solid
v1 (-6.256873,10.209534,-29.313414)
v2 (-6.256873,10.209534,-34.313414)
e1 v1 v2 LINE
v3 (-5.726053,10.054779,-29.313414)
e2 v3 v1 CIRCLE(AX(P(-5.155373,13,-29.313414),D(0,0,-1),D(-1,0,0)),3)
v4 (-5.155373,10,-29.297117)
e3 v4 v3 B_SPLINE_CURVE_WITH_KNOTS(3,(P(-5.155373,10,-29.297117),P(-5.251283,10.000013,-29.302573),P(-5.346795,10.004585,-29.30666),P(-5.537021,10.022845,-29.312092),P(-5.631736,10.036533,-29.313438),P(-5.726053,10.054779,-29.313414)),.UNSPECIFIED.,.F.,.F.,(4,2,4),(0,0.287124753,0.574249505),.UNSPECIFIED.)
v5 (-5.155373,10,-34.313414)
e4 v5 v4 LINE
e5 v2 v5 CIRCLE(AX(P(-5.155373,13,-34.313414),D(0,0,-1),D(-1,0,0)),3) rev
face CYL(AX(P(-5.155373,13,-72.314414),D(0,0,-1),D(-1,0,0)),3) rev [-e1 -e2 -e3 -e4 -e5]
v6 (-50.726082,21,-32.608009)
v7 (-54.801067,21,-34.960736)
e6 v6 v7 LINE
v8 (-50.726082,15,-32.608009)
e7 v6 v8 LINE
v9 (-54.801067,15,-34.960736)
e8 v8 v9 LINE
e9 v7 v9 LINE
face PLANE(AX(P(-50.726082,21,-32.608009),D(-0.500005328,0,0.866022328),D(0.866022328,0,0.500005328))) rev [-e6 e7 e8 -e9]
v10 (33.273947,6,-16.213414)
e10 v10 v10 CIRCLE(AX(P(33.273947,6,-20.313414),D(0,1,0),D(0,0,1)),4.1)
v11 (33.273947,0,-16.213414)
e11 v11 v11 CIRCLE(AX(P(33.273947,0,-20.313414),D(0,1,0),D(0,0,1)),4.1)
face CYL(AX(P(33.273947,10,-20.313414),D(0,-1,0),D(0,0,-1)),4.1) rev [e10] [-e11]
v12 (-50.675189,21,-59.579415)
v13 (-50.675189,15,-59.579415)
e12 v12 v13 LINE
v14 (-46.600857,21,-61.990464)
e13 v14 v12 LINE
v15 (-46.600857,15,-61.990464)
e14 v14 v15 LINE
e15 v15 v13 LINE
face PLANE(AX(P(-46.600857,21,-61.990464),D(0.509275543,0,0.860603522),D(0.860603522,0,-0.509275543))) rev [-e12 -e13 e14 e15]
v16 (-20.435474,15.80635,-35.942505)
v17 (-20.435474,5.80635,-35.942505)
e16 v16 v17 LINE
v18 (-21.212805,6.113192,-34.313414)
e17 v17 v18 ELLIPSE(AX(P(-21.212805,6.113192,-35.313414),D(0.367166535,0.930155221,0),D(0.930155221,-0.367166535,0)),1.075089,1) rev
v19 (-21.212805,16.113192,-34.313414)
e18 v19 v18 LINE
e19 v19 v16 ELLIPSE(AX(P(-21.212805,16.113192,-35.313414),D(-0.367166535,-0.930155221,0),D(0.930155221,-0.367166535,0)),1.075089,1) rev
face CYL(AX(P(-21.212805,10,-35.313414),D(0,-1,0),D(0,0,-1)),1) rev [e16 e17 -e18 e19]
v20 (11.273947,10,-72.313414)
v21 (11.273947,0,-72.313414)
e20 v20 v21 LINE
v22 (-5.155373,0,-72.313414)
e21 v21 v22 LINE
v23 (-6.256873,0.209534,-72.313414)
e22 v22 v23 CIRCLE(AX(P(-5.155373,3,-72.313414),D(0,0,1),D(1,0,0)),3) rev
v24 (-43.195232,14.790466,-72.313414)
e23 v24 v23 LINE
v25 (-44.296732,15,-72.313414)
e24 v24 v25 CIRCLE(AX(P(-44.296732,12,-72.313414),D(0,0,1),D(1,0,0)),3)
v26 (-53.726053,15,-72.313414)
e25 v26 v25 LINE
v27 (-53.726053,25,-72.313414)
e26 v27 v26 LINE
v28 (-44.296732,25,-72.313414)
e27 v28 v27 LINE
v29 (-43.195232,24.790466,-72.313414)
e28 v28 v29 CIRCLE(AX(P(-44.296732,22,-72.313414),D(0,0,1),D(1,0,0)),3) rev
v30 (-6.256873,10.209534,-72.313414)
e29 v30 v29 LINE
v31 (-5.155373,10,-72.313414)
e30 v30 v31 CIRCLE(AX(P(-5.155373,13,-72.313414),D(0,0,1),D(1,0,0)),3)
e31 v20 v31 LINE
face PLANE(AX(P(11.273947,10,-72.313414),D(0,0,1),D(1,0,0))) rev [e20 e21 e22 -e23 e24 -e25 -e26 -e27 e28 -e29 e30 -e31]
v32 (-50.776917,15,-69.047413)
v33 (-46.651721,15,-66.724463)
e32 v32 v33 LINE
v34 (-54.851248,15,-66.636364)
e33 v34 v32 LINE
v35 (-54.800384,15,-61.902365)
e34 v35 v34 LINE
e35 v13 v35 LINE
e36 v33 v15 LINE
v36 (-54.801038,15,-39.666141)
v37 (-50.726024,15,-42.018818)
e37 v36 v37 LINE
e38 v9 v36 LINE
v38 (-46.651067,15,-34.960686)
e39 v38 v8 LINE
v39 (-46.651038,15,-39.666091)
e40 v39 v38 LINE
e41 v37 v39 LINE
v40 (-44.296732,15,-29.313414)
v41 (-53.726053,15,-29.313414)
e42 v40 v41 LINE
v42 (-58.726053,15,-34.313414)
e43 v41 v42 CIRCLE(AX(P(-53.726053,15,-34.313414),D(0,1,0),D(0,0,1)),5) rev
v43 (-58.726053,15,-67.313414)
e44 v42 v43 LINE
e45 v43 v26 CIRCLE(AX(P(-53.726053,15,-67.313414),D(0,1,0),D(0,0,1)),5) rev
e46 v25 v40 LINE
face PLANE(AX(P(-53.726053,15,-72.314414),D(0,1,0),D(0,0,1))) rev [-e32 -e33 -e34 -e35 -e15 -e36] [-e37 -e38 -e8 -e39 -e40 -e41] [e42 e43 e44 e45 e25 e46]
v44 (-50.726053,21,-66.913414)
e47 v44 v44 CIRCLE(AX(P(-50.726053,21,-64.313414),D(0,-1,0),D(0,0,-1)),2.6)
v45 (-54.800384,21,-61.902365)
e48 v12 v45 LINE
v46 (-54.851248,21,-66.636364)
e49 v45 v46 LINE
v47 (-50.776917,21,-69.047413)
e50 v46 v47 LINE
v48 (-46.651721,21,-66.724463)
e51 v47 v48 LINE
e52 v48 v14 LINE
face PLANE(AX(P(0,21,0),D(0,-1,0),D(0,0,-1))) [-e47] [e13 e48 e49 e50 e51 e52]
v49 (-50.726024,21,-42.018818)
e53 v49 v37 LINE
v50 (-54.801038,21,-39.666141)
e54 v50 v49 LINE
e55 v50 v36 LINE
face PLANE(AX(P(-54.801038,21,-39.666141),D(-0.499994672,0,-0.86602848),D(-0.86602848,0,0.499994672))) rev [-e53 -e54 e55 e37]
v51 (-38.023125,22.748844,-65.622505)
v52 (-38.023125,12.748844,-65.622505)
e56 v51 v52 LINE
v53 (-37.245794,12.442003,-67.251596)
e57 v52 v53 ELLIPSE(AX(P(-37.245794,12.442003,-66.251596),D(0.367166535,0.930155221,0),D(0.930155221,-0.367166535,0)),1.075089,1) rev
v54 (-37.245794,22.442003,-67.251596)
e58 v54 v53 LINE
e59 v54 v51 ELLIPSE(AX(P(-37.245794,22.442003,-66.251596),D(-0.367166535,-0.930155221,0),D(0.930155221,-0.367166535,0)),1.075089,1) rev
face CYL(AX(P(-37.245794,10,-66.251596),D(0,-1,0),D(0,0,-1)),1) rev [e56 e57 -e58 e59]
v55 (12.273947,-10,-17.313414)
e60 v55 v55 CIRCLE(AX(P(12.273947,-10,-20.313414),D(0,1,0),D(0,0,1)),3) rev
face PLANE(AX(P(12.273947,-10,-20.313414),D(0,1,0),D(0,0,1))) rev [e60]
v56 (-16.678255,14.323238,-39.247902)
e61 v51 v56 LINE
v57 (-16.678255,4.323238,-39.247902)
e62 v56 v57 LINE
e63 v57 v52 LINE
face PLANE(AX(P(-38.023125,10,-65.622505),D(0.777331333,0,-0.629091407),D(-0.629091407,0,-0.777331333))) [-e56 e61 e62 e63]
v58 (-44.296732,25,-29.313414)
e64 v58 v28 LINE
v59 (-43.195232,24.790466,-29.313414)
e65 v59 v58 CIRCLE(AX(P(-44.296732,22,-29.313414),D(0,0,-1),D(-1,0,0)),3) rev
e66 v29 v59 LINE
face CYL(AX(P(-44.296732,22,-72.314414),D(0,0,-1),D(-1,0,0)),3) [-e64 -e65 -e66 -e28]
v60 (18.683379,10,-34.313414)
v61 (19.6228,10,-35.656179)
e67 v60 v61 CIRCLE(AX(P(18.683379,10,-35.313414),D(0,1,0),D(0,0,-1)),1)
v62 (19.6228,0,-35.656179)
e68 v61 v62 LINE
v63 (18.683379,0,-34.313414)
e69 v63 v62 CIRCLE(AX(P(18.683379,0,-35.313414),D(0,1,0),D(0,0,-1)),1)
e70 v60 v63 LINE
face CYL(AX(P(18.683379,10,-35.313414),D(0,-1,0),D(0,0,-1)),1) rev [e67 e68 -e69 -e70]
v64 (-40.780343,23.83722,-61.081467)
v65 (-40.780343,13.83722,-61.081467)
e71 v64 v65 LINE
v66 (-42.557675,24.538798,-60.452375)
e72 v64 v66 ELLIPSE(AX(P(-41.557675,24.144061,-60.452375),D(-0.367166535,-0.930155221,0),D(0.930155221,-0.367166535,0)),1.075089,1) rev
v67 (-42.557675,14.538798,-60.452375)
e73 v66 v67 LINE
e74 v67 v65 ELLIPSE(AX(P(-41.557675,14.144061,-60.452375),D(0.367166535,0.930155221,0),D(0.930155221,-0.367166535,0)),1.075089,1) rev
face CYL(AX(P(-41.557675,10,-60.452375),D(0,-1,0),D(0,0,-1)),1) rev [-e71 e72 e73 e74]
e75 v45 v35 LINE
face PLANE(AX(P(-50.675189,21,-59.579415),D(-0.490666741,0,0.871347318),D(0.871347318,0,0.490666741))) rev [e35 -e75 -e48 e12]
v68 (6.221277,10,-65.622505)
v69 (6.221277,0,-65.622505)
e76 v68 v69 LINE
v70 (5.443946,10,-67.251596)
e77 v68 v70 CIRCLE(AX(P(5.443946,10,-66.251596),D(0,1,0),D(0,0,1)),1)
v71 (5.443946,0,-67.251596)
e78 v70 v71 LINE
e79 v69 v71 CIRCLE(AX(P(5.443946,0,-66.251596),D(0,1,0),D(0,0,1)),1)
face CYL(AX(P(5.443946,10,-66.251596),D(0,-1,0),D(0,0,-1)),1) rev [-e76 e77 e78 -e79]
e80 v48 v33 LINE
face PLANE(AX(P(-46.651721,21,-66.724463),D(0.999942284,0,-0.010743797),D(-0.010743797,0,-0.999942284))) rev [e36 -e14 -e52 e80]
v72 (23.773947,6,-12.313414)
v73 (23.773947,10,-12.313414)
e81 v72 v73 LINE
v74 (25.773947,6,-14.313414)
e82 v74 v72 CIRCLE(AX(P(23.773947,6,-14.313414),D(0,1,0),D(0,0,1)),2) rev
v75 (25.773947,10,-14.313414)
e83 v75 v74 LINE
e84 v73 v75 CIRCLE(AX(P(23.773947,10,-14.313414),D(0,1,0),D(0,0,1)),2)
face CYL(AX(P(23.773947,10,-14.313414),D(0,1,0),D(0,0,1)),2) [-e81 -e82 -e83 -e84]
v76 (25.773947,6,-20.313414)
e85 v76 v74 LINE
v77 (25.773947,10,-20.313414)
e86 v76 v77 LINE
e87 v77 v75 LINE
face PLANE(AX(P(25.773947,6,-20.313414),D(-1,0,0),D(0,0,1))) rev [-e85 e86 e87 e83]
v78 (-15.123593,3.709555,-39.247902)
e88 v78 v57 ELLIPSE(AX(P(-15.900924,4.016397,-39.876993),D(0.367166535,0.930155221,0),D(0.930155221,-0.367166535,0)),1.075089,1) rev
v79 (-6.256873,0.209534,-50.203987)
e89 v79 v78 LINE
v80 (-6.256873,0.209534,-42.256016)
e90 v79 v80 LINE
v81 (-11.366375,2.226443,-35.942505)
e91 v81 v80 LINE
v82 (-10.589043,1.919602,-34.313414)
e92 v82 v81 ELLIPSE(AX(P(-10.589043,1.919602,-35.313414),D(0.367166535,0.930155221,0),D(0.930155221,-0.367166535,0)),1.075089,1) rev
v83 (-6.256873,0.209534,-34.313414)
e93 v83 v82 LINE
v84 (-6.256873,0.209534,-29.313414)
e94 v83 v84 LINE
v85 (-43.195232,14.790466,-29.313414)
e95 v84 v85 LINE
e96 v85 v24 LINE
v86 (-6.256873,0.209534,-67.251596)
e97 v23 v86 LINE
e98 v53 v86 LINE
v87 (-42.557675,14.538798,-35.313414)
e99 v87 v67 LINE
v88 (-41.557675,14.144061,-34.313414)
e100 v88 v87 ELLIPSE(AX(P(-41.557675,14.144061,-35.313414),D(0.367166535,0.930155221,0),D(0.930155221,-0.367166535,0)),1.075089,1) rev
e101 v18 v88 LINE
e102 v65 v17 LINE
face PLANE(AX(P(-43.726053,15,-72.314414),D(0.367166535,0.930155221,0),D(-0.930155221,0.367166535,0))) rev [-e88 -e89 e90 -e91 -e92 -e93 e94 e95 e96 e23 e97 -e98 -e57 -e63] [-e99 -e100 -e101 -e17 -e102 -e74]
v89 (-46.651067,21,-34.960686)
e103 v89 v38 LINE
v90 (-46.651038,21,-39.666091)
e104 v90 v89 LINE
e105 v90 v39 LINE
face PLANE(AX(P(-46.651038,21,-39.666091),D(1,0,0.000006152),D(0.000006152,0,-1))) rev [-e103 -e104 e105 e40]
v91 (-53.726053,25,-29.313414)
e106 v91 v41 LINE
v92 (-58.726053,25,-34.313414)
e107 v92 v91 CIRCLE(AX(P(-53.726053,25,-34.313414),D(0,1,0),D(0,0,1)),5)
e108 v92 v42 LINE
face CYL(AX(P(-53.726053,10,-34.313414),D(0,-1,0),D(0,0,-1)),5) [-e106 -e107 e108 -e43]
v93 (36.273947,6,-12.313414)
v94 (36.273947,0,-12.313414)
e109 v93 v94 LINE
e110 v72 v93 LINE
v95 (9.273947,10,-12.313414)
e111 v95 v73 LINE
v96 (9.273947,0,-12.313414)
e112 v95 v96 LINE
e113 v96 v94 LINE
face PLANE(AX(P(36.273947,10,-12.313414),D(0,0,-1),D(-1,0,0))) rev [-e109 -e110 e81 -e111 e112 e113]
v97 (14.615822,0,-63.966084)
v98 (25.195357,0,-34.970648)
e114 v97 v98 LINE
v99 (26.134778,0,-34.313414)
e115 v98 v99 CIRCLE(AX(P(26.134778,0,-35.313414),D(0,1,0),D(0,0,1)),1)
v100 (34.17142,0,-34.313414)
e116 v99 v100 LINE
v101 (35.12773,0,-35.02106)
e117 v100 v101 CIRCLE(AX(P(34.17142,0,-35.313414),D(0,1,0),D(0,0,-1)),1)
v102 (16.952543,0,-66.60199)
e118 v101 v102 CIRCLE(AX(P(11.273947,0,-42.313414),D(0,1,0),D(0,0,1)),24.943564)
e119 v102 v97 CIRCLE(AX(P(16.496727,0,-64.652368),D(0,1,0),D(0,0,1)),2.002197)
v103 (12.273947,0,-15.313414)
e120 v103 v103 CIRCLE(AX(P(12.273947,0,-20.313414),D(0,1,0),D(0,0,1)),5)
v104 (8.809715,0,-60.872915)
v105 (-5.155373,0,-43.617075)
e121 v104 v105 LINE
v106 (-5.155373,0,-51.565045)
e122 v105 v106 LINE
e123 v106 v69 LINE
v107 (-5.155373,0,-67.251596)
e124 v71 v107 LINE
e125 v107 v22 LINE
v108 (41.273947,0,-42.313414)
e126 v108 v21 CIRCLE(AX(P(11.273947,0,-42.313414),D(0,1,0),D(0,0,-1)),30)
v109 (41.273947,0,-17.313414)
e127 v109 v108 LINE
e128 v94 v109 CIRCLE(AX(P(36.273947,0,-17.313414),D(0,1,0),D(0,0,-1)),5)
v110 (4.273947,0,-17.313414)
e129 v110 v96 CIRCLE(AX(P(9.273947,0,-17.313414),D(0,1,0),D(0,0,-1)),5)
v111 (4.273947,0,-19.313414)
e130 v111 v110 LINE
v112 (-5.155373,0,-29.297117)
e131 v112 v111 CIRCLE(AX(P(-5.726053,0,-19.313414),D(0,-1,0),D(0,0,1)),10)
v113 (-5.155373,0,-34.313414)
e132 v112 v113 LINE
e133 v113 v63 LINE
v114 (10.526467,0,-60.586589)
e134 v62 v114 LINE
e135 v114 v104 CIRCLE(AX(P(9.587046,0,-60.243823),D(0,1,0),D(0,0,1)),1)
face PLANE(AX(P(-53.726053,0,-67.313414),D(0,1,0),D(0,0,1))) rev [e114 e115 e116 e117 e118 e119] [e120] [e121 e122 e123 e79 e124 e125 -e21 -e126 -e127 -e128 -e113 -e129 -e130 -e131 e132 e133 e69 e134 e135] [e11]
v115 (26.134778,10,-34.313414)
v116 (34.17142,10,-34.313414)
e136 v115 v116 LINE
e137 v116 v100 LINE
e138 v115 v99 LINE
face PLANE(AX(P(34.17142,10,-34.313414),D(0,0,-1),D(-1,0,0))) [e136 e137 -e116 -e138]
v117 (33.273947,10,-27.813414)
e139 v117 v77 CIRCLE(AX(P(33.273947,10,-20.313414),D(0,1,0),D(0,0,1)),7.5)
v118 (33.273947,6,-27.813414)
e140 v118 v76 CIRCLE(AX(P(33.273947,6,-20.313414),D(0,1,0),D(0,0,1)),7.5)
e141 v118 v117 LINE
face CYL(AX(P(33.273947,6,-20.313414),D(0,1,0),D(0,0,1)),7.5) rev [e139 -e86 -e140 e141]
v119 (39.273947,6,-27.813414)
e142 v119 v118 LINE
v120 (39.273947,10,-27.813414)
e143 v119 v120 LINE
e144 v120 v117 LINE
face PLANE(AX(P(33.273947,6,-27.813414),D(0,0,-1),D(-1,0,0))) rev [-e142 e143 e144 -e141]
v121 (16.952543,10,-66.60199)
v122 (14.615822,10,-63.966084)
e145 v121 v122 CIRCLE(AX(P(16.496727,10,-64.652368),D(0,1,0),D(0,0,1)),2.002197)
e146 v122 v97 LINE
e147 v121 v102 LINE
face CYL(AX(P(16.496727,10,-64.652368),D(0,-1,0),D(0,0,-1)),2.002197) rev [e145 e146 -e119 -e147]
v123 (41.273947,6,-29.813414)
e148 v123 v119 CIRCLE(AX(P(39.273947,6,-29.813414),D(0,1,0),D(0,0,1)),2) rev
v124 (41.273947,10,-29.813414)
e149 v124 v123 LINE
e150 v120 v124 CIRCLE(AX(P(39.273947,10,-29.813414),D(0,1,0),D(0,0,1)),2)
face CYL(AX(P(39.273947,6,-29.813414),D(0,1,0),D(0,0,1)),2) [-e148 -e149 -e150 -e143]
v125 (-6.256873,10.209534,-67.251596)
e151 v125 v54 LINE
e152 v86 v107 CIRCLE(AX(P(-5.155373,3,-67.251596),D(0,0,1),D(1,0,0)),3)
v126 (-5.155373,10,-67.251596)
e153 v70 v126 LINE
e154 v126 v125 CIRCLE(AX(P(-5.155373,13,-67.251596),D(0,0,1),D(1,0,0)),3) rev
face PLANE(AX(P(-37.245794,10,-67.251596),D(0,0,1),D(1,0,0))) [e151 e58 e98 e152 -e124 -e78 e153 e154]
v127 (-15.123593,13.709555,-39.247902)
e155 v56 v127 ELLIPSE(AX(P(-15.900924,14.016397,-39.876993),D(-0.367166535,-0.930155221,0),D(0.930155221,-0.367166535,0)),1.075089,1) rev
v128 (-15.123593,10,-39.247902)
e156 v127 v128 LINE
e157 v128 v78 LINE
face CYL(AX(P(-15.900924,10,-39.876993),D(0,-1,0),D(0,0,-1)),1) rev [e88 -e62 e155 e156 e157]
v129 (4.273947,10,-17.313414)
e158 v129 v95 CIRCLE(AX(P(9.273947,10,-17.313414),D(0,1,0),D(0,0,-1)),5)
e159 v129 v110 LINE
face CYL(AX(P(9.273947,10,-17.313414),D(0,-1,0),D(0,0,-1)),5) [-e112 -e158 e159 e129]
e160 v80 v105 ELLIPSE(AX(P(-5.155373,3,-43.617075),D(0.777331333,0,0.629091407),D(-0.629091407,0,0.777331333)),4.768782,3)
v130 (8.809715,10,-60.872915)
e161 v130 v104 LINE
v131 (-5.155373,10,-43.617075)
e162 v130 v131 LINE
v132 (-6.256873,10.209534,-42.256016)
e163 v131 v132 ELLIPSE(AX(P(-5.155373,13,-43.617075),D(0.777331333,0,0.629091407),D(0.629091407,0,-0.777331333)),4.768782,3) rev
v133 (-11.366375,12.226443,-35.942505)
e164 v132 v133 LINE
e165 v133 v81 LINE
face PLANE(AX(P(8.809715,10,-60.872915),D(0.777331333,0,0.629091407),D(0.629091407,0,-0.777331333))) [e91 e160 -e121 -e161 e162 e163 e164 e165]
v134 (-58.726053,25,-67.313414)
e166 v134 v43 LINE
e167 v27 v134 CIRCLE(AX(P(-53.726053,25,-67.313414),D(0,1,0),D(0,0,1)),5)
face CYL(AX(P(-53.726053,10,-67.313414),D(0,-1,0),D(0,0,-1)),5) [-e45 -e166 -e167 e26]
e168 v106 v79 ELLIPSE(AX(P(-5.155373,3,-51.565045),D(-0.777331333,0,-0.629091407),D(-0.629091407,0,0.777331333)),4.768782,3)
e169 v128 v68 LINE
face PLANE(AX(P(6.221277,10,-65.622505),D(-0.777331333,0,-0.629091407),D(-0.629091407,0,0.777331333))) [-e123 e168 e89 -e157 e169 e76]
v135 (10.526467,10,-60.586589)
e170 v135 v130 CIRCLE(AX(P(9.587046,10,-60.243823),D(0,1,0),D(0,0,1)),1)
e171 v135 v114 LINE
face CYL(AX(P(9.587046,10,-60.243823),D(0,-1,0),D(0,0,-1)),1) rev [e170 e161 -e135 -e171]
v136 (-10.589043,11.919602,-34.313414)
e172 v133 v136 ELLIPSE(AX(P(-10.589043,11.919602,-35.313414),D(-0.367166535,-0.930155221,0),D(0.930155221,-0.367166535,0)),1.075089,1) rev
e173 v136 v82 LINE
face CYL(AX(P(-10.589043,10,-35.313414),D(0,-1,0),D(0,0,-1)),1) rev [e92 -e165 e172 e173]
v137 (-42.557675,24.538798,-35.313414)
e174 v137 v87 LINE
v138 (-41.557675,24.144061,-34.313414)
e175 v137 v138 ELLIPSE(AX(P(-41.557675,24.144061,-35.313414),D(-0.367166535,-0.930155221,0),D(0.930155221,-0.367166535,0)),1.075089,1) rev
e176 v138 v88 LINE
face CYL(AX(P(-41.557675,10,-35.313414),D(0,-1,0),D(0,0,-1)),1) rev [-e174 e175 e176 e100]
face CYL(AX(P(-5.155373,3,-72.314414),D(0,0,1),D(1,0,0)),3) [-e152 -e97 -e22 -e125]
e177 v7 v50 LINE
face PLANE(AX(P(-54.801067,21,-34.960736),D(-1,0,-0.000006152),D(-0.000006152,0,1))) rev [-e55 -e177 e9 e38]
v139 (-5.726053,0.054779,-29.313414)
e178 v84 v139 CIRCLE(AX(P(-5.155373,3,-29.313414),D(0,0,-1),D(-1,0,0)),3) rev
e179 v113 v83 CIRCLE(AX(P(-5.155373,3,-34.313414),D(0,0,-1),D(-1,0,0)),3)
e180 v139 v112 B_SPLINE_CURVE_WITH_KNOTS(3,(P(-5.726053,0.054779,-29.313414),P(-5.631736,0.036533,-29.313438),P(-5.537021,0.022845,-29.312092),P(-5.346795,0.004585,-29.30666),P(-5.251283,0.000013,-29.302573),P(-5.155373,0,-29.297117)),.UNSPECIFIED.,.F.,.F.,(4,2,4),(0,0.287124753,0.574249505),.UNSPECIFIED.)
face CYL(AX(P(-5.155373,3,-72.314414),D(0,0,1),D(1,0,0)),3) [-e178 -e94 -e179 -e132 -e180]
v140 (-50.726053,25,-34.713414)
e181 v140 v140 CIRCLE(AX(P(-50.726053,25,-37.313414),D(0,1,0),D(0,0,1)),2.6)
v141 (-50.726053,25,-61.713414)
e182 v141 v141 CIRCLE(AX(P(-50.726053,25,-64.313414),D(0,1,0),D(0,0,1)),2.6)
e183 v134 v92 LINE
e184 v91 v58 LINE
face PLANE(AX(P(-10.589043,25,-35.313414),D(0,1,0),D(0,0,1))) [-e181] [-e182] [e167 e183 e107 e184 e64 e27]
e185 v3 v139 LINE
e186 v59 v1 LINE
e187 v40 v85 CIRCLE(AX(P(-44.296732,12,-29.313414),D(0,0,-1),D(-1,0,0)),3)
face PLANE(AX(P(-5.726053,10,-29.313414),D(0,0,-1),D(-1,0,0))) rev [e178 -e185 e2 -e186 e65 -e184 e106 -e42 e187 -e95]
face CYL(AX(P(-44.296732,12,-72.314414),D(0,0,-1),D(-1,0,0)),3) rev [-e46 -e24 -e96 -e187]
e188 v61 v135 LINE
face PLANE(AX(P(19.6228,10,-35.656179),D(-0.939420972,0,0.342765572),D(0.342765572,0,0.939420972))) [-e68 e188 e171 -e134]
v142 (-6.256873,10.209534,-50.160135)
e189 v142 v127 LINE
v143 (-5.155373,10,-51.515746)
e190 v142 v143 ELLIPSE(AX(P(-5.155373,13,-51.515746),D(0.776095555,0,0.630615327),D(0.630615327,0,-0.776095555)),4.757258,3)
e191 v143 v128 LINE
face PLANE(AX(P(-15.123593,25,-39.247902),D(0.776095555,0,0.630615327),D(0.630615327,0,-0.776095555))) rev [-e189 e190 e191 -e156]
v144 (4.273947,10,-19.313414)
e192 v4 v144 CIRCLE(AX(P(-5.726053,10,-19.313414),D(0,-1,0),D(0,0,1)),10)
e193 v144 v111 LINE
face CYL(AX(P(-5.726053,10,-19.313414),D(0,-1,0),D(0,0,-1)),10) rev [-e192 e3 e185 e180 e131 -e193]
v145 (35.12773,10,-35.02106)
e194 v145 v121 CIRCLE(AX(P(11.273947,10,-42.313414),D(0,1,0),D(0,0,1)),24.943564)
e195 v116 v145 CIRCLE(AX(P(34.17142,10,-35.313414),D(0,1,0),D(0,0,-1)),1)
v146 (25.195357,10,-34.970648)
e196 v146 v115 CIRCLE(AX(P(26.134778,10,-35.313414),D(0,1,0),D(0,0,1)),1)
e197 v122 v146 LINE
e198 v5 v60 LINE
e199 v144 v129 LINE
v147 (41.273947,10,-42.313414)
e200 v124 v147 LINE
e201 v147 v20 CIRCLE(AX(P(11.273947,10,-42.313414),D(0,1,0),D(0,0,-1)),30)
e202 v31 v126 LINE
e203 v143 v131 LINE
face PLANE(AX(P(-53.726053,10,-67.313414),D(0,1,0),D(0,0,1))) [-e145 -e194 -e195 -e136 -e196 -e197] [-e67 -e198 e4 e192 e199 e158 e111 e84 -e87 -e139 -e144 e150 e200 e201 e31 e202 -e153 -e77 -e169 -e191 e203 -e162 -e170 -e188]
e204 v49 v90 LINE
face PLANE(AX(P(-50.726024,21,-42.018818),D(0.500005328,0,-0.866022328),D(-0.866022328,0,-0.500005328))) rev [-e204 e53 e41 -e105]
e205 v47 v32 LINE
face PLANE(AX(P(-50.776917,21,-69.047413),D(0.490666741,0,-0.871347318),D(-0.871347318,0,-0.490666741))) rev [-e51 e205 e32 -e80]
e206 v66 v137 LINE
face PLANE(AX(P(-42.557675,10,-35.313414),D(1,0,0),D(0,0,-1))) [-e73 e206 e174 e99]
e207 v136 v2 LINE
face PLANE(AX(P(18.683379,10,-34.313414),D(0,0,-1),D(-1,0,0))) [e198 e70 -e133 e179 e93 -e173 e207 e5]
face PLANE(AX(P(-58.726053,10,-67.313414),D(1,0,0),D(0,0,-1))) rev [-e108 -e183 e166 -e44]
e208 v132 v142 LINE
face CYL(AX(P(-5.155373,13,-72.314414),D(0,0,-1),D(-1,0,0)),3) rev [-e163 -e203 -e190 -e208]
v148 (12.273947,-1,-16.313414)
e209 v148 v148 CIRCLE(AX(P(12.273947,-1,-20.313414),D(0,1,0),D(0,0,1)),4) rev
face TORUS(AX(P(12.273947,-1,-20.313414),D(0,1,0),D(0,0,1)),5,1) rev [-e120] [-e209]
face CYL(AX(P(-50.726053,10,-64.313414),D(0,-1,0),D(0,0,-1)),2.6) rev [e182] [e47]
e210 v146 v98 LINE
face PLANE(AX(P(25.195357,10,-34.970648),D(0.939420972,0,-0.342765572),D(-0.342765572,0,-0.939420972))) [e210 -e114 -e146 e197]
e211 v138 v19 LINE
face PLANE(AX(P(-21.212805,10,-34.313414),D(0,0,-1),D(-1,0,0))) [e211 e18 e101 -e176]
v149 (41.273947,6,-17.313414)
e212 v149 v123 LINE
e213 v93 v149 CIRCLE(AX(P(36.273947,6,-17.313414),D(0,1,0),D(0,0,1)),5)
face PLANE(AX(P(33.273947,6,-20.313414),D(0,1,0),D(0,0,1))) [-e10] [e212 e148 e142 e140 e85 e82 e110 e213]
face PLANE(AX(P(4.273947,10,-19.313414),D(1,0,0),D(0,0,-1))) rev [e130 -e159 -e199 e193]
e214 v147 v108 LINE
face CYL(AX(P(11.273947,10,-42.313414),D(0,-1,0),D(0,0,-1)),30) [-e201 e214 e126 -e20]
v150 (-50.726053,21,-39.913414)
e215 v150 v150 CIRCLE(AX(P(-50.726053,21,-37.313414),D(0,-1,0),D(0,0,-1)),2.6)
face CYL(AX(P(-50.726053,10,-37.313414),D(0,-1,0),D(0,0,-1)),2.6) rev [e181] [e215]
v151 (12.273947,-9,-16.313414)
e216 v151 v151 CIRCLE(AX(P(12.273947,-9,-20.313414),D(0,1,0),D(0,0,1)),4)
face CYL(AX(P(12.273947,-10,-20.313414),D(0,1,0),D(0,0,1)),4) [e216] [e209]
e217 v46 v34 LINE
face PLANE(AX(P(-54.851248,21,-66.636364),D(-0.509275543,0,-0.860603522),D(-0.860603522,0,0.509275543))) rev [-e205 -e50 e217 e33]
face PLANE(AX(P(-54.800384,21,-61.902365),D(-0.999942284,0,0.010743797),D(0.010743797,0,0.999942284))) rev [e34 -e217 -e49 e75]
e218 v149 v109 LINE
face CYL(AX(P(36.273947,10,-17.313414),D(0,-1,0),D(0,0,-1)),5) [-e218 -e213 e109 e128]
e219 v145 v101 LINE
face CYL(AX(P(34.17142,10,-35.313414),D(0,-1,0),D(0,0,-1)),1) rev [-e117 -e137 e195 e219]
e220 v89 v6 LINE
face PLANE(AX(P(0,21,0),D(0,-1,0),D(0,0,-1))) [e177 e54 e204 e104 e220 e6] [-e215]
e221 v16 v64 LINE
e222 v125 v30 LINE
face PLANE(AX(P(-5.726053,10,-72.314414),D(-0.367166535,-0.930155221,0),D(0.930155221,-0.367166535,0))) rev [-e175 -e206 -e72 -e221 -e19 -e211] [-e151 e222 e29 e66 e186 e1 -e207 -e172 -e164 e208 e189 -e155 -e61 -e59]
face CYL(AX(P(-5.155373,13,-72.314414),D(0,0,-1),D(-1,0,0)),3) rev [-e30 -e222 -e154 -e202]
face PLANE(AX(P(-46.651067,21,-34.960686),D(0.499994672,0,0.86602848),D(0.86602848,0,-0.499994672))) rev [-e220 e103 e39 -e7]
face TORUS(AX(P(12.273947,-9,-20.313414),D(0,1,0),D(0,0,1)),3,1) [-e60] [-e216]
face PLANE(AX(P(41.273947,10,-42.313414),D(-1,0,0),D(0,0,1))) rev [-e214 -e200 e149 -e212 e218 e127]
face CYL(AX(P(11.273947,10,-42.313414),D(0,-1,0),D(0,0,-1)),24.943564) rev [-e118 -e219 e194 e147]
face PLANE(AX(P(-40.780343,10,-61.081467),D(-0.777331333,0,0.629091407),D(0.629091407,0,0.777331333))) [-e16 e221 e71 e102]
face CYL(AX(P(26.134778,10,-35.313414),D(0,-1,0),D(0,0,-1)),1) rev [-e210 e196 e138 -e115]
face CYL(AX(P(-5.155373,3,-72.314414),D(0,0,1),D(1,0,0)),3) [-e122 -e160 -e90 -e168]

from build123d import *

# Parameters (mm, degrees)
SKETCH1_R           = 4.1
SKETCH1_R_2         = 4
SKETCH1_R_3         = 2.6
BOSS_EXTRUDE1_DEPTH = 10
CUT_EXTRUDE1_START  = -4
CUT_EXTRUDE1_DEPTH  = 4
FILLET1_R           = 2
BOSS_EXTRUDE2_START = -20
SKETCH3_R           = 4
BOSS_EXTRUDE2_DEPTH = 20
FILLET2_R           = 1
SKETCH4_R           = 2.6
BOSS_EXTRUDE3_DEPTH = 15
CUT_EXTRUDE2_REACH  = 78.959
FILLET3_R           = 3
CUT_EXTRUDE3_DEPTH  = 6


with BuildPart() as part:
    # Sketch1 → Boss-Extrude1 (new body)
    with BuildSketch(Plane(origin=(0, 0, 0), x_dir=(1, 0, 0), z_dir=(0, 1, 0))):
        with BuildLine():
            Line((11.273947383, 72.313413723), (4.792068361, 72.313413723))
            Line((4.792068361, 72.313413723), (-53.726052617, 72.313413723))
            ThreePointArc((-53.726052617, 72.313413723), (-57.261586523, 70.848947629), (-58.726052617, 67.313413723))
            Line((-58.726052617, 67.313413723), (-58.726052617, 34.313413723))
            ThreePointArc((-58.726052617, 34.313413723), (-57.261586523, 30.777879817), (-53.726052617, 29.313413723))
            Line((-53.726052617, 29.313413723), (-5.726052617, 29.313413723))
            ThreePointArc((-5.726052617, 29.313413723), (1.345015195, 26.384481534), (4.273947383, 19.313413723))
            Line((4.273947383, 19.313413723), (4.273947383, 17.313413723))
            ThreePointArc((4.273947383, 17.313413723), (5.738413477, 13.777879817), (9.273947383, 12.313413723))
            Line((9.273947383, 12.313413723), (36.273947383, 12.313413723))
            ThreePointArc((36.273947383, 12.313413723), (39.809481289, 13.777879817), (41.273947383, 17.313413723))
            Line((41.273947383, 17.313413723), (41.273947383, 42.313413723))
            ThreePointArc((41.273947383, 42.313413723), (32.487150819, 63.526617158), (11.273947383, 72.313413723))
        make_face()
        with Locations((33.273947383, 20.313413723)):
            Circle(SKETCH1_R, mode=Mode.SUBTRACT)
        with Locations((12.273947383, 20.313413723)):
            Circle(SKETCH1_R_2, mode=Mode.SUBTRACT)
        with Locations((-50.726052617, 64.313413723)):
            Circle(SKETCH1_R_3, mode=Mode.SUBTRACT)
        with Locations((-50.726052617, 37.313413723)):
            Circle(SKETCH1_R_3, mode=Mode.SUBTRACT)
        with BuildLine():
            Line((34.171420048, 34.313413723), (26.134777641, 34.313413723))
            ThreePointArc((26.134777641, 34.313413723), (25.561526201, 34.49403421), (25.19535667, 34.97064815))
            Line((25.19535667, 34.97064815), (14.615821544, 63.966084002))
            ThreePointArc((14.615821544, 63.966084002), (14.998488248, 65.980552022), (16.952543045, 66.601989919))
            ThreePointArc((16.952543045, 66.601989919), (32.892900514, 54.755368869), (35.127730175, 35.021059585))
            ThreePointArc((35.127730175, 35.021059585), (34.766250218, 34.509562325), (34.171420048, 34.313413723))
        make_face(mode=Mode.SUBTRACT)
        with BuildLine():
            Line((-42.557674575, 35.313413723), (-42.557674575, 60.452375226))
            ThreePointArc((-42.557674575, 60.452375226), (-41.891342574, 61.395065879), (-40.780343242, 61.081466633))
            Line((-40.780343242, 61.081466633), (-20.435473581, 35.94250513))
            ThreePointArc((-20.435473581, 35.94250513), (-20.310283056, 34.882769674), (-21.212804914, 34.313413723))
            Line((-21.212804914, 34.313413723), (-41.557674575, 34.313413723))
            ThreePointArc((-41.557674575, 34.313413723), (-42.264781356, 34.606306941), (-42.557674575, 35.313413723))
        make_face(mode=Mode.SUBTRACT)
        with BuildLine():
            Line((-37.245793747, 67.251595954), (5.443945576, 67.251595954))
            ThreePointArc((5.443945576, 67.251595954), (6.346467434, 66.682240002), (6.221276909, 65.622504547))
            Line((6.221276909, 65.622504547), (-15.123592752, 39.247901728))
            ThreePointArc((-15.123592752, 39.247901728), (-15.900924085, 38.876993135), (-16.678255419, 39.247901728))
            Line((-16.678255419, 39.247901728), (-38.02312508, 65.622504547))
            ThreePointArc((-38.02312508, 65.622504547), (-38.148315604, 66.682240002), (-37.245793747, 67.251595954))
        make_face(mode=Mode.SUBTRACT)
        with BuildLine():
            Line((19.622800135, 35.656179295), (10.526467022, 60.58658882))
            ThreePointArc((10.526467022, 60.58658882), (9.751557094, 61.230198488), (8.809714717, 60.872914654))
            Line((8.809714717, 60.872914654), (-11.36637459, 35.94250513))
            ThreePointArc((-11.36637459, 35.94250513), (-11.491565114, 34.882769674), (-10.589043257, 34.313413723))
            Line((-10.589043257, 34.313413723), (18.683379163, 34.313413723))
            ThreePointArc((18.683379163, 34.313413723), (19.502758676, 34.740162282), (19.622800135, 35.656179295))
        make_face(mode=Mode.SUBTRACT)
    extrude(amount=BOSS_EXTRUDE1_DEPTH)

    # Sketch2 → Cut-Extrude1 (cut)
    with BuildSketch(Plane(origin=(0, 10, 0), x_dir=(1, 0, 0), z_dir=(0, 1, 0)).offset(CUT_EXTRUDE1_START)):
        with BuildLine():
            Line((33.273947383, 27.813413723), (41.273947383, 27.813413723))
            Line((41.273947383, 27.813413723), (41.273947383, 17.313413723))
            ThreePointArc((41.273947383, 17.313413723), (39.809481289, 13.777879817), (36.273947383, 12.313413723))
            Line((36.273947383, 12.313413723), (25.773947383, 12.313413723))
            Line((25.773947383, 12.313413723), (25.773947383, 20.313413723))
            ThreePointArc((25.773947383, 20.313413723), (27.970646524, 25.616714582), (33.273947383, 27.813413723))
        make_face()
    extrude(amount=CUT_EXTRUDE1_DEPTH, mode=Mode.SUBTRACT)

    # Fillet1
    fillet1_edges = [part.edges().sort_by_distance(p)[0] for p in [
        (41.273947383, 8, -27.813413723),
        (25.773947383, 8, -12.313413723),
    ]]
    fillet(fillet1_edges, radius=FILLET1_R)

    # Sketch3 → Boss-Extrude2 (add)
    with BuildSketch(Plane(origin=(0, 10, 0), x_dir=(1, 0, 0), z_dir=(0, 1, 0)).offset(BOSS_EXTRUDE2_START)):
        with Locations((12.273947383, 20.313413723)):
            Circle(SKETCH3_R)
    extrude(amount=BOSS_EXTRUDE2_DEPTH)

    # Fillet2
    fillet2_edges = [part.edges().sort_by_distance(p)[0] for p in [
        (8.273947383, -10, -20.313413723),
        (8.273947383, 0, -20.313413723),
    ]]
    fillet(fillet2_edges, radius=FILLET2_R)

    # Sketch4 → Boss-Extrude3 (add)
    with BuildSketch(Plane(origin=(0, 10, 0), x_dir=(1, 0, 0), z_dir=(0, 1, 0))):
        with BuildLine():
            Line((-58.726052617, 67.313413723), (-58.726052617, 34.313413723))
            ThreePointArc((-58.726052617, 34.313413723), (-57.261586523, 30.777879817), (-53.726052617, 29.313413723))
            Line((-53.726052617, 29.313413723), (-5.726052617, 29.313413723))
            Line((-5.726052617, 29.313413723), (-5.726052617, 34.313413723))
            Line((-5.726052617, 34.313413723), (-10.589043257, 34.313413723))
            ThreePointArc((-10.589043257, 34.313413723), (-11.491565114, 34.882769674), (-11.36637459, 35.94250513))
            Line((-11.36637459, 35.94250513), (-5.726052617, 42.91191999))
            Line((-5.726052617, 42.91191999), (-5.726052617, 50.813413723))
            Line((-5.726052617, 50.813413723), (-15.123592752, 39.247901728))
            ThreePointArc((-15.123592752, 39.247901728), (-15.900924085, 38.876993135), (-16.678255419, 39.247901728))
            Line((-16.678255419, 39.247901728), (-38.02312508, 65.622504547))
            ThreePointArc((-38.02312508, 65.622504547), (-38.148315604, 66.682240002), (-37.245793747, 67.251595954))
            Line((-37.245793747, 67.251595954), (-5.726052617, 67.251595954))
            Line((-5.726052617, 67.251595954), (-5.726052617, 72.313413723))
            Line((-5.726052617, 72.313413723), (-53.726052617, 72.313413723))
            ThreePointArc((-53.726052617, 72.313413723), (-57.261586523, 70.848947629), (-58.726052617, 67.313413723))
        make_face()
        with Locations((-50.726052617, 64.313413723)):
            Circle(SKETCH4_R, mode=Mode.SUBTRACT)
        with Locations((-50.726052617, 37.313413723)):
            Circle(SKETCH4_R, mode=Mode.SUBTRACT)
        with BuildLine():
            Line((-40.780343242, 61.081466633), (-20.435473581, 35.94250513))
            ThreePointArc((-20.435473581, 35.94250513), (-20.310283056, 34.882769674), (-21.212804914, 34.313413723))
            Line((-21.212804914, 34.313413723), (-41.557674575, 34.313413723))
            ThreePointArc((-41.557674575, 34.313413723), (-42.264781356, 34.606306941), (-42.557674575, 35.313413723))
            Line((-42.557674575, 35.313413723), (-42.557674575, 60.452375226))
            ThreePointArc((-42.557674575, 60.452375226), (-41.891342574, 61.395065879), (-40.780343242, 61.081466633))
        make_face(mode=Mode.SUBTRACT)
    extrude(amount=BOSS_EXTRUDE3_DEPTH)

    # Sketch5 → Cut-Extrude2 (cut, up to next)
    with BuildSketch(Plane.XY.offset(-29.313413723), mode=Mode.PRIVATE) as cut_extrude2_sk1:
        Polygon((-5.726052617, 10), (-43.726052617, 25), (-5.726052617, 25), align=None)
    cut_extrude2_tool1 = extrude(cut_extrude2_sk1.sketch, amount=-CUT_EXTRUDE2_REACH, mode=Mode.PRIVATE) & part.part
    # Sketch5 → Cut-Extrude2 (cut, up to next)
    with BuildSketch(Plane.XY.offset(-29.313413723), mode=Mode.PRIVATE) as cut_extrude2_sk2:
        Polygon((-53.726052617, 15), (-43.726052617, 15), (-5.726052617, 0), (-60.945305148, 0), (-60.945305148, 15), align=None)
    cut_extrude2_tool2 = extrude(cut_extrude2_sk2.sketch, amount=-CUT_EXTRUDE2_REACH, mode=Mode.PRIVATE) & part.part
    add(cut_extrude2_tool1.solids().sort_by_distance((-18.392719, 20, -29.313414))[0], mode=Mode.SUBTRACT)
    add(cut_extrude2_tool2.solids().sort_by_distance((-41.1745, 6.188543, -29.313414))[0], mode=Mode.SUBTRACT)

    # Fillet3
    fillet3_edges = [part.edges().sort_by_distance(p)[0] for p in [
        (-5.726052617, 10, -31.813413723),
        (-5.726052617, 10, -46.862666856),
        (-5.726052617, 10, -69.782504838),
        (-43.726052617, 15, -50.813413723),
    ]]
    fillet(fillet3_edges, radius=FILLET3_R)
    fillet3_2_edges = [part.edges().sort_by_distance(p)[0] for p in [
        (-43.726052617, 25, -50.813413723),
        (-5.726052617, 0, -69.782504838),
        (-5.726052617, 0, -46.885905285),
        (-5.726052617, 0, -31.813413723),
    ]]
    fillet(fillet3_2_edges, radius=FILLET3_R)

    # Sketch6 → Cut-Extrude3 (cut)
    with BuildSketch(Plane(origin=(0, 15, 0), x_dir=(-1, 0, 0), z_dir=(0, -1, 0))):
        Polygon((54.800383951, 61.902364674), (54.85124801, 66.636363637), (50.776916675, 69.047412686), (46.651721283, 66.724462771), (46.600857225, 61.990463808), (50.675188559, 59.57941476), align=None)
        Polygon((54.801038143, 39.66614114), (50.726023668, 42.018818416), (46.651038143, 39.666090999), (46.651067091, 34.960686305), (50.726081566, 32.608009029), (54.801067091, 34.960736446), align=None)
    extrude(amount=-CUT_EXTRUDE3_DEPTH, mode=Mode.SUBTRACT)


solid = part.part
